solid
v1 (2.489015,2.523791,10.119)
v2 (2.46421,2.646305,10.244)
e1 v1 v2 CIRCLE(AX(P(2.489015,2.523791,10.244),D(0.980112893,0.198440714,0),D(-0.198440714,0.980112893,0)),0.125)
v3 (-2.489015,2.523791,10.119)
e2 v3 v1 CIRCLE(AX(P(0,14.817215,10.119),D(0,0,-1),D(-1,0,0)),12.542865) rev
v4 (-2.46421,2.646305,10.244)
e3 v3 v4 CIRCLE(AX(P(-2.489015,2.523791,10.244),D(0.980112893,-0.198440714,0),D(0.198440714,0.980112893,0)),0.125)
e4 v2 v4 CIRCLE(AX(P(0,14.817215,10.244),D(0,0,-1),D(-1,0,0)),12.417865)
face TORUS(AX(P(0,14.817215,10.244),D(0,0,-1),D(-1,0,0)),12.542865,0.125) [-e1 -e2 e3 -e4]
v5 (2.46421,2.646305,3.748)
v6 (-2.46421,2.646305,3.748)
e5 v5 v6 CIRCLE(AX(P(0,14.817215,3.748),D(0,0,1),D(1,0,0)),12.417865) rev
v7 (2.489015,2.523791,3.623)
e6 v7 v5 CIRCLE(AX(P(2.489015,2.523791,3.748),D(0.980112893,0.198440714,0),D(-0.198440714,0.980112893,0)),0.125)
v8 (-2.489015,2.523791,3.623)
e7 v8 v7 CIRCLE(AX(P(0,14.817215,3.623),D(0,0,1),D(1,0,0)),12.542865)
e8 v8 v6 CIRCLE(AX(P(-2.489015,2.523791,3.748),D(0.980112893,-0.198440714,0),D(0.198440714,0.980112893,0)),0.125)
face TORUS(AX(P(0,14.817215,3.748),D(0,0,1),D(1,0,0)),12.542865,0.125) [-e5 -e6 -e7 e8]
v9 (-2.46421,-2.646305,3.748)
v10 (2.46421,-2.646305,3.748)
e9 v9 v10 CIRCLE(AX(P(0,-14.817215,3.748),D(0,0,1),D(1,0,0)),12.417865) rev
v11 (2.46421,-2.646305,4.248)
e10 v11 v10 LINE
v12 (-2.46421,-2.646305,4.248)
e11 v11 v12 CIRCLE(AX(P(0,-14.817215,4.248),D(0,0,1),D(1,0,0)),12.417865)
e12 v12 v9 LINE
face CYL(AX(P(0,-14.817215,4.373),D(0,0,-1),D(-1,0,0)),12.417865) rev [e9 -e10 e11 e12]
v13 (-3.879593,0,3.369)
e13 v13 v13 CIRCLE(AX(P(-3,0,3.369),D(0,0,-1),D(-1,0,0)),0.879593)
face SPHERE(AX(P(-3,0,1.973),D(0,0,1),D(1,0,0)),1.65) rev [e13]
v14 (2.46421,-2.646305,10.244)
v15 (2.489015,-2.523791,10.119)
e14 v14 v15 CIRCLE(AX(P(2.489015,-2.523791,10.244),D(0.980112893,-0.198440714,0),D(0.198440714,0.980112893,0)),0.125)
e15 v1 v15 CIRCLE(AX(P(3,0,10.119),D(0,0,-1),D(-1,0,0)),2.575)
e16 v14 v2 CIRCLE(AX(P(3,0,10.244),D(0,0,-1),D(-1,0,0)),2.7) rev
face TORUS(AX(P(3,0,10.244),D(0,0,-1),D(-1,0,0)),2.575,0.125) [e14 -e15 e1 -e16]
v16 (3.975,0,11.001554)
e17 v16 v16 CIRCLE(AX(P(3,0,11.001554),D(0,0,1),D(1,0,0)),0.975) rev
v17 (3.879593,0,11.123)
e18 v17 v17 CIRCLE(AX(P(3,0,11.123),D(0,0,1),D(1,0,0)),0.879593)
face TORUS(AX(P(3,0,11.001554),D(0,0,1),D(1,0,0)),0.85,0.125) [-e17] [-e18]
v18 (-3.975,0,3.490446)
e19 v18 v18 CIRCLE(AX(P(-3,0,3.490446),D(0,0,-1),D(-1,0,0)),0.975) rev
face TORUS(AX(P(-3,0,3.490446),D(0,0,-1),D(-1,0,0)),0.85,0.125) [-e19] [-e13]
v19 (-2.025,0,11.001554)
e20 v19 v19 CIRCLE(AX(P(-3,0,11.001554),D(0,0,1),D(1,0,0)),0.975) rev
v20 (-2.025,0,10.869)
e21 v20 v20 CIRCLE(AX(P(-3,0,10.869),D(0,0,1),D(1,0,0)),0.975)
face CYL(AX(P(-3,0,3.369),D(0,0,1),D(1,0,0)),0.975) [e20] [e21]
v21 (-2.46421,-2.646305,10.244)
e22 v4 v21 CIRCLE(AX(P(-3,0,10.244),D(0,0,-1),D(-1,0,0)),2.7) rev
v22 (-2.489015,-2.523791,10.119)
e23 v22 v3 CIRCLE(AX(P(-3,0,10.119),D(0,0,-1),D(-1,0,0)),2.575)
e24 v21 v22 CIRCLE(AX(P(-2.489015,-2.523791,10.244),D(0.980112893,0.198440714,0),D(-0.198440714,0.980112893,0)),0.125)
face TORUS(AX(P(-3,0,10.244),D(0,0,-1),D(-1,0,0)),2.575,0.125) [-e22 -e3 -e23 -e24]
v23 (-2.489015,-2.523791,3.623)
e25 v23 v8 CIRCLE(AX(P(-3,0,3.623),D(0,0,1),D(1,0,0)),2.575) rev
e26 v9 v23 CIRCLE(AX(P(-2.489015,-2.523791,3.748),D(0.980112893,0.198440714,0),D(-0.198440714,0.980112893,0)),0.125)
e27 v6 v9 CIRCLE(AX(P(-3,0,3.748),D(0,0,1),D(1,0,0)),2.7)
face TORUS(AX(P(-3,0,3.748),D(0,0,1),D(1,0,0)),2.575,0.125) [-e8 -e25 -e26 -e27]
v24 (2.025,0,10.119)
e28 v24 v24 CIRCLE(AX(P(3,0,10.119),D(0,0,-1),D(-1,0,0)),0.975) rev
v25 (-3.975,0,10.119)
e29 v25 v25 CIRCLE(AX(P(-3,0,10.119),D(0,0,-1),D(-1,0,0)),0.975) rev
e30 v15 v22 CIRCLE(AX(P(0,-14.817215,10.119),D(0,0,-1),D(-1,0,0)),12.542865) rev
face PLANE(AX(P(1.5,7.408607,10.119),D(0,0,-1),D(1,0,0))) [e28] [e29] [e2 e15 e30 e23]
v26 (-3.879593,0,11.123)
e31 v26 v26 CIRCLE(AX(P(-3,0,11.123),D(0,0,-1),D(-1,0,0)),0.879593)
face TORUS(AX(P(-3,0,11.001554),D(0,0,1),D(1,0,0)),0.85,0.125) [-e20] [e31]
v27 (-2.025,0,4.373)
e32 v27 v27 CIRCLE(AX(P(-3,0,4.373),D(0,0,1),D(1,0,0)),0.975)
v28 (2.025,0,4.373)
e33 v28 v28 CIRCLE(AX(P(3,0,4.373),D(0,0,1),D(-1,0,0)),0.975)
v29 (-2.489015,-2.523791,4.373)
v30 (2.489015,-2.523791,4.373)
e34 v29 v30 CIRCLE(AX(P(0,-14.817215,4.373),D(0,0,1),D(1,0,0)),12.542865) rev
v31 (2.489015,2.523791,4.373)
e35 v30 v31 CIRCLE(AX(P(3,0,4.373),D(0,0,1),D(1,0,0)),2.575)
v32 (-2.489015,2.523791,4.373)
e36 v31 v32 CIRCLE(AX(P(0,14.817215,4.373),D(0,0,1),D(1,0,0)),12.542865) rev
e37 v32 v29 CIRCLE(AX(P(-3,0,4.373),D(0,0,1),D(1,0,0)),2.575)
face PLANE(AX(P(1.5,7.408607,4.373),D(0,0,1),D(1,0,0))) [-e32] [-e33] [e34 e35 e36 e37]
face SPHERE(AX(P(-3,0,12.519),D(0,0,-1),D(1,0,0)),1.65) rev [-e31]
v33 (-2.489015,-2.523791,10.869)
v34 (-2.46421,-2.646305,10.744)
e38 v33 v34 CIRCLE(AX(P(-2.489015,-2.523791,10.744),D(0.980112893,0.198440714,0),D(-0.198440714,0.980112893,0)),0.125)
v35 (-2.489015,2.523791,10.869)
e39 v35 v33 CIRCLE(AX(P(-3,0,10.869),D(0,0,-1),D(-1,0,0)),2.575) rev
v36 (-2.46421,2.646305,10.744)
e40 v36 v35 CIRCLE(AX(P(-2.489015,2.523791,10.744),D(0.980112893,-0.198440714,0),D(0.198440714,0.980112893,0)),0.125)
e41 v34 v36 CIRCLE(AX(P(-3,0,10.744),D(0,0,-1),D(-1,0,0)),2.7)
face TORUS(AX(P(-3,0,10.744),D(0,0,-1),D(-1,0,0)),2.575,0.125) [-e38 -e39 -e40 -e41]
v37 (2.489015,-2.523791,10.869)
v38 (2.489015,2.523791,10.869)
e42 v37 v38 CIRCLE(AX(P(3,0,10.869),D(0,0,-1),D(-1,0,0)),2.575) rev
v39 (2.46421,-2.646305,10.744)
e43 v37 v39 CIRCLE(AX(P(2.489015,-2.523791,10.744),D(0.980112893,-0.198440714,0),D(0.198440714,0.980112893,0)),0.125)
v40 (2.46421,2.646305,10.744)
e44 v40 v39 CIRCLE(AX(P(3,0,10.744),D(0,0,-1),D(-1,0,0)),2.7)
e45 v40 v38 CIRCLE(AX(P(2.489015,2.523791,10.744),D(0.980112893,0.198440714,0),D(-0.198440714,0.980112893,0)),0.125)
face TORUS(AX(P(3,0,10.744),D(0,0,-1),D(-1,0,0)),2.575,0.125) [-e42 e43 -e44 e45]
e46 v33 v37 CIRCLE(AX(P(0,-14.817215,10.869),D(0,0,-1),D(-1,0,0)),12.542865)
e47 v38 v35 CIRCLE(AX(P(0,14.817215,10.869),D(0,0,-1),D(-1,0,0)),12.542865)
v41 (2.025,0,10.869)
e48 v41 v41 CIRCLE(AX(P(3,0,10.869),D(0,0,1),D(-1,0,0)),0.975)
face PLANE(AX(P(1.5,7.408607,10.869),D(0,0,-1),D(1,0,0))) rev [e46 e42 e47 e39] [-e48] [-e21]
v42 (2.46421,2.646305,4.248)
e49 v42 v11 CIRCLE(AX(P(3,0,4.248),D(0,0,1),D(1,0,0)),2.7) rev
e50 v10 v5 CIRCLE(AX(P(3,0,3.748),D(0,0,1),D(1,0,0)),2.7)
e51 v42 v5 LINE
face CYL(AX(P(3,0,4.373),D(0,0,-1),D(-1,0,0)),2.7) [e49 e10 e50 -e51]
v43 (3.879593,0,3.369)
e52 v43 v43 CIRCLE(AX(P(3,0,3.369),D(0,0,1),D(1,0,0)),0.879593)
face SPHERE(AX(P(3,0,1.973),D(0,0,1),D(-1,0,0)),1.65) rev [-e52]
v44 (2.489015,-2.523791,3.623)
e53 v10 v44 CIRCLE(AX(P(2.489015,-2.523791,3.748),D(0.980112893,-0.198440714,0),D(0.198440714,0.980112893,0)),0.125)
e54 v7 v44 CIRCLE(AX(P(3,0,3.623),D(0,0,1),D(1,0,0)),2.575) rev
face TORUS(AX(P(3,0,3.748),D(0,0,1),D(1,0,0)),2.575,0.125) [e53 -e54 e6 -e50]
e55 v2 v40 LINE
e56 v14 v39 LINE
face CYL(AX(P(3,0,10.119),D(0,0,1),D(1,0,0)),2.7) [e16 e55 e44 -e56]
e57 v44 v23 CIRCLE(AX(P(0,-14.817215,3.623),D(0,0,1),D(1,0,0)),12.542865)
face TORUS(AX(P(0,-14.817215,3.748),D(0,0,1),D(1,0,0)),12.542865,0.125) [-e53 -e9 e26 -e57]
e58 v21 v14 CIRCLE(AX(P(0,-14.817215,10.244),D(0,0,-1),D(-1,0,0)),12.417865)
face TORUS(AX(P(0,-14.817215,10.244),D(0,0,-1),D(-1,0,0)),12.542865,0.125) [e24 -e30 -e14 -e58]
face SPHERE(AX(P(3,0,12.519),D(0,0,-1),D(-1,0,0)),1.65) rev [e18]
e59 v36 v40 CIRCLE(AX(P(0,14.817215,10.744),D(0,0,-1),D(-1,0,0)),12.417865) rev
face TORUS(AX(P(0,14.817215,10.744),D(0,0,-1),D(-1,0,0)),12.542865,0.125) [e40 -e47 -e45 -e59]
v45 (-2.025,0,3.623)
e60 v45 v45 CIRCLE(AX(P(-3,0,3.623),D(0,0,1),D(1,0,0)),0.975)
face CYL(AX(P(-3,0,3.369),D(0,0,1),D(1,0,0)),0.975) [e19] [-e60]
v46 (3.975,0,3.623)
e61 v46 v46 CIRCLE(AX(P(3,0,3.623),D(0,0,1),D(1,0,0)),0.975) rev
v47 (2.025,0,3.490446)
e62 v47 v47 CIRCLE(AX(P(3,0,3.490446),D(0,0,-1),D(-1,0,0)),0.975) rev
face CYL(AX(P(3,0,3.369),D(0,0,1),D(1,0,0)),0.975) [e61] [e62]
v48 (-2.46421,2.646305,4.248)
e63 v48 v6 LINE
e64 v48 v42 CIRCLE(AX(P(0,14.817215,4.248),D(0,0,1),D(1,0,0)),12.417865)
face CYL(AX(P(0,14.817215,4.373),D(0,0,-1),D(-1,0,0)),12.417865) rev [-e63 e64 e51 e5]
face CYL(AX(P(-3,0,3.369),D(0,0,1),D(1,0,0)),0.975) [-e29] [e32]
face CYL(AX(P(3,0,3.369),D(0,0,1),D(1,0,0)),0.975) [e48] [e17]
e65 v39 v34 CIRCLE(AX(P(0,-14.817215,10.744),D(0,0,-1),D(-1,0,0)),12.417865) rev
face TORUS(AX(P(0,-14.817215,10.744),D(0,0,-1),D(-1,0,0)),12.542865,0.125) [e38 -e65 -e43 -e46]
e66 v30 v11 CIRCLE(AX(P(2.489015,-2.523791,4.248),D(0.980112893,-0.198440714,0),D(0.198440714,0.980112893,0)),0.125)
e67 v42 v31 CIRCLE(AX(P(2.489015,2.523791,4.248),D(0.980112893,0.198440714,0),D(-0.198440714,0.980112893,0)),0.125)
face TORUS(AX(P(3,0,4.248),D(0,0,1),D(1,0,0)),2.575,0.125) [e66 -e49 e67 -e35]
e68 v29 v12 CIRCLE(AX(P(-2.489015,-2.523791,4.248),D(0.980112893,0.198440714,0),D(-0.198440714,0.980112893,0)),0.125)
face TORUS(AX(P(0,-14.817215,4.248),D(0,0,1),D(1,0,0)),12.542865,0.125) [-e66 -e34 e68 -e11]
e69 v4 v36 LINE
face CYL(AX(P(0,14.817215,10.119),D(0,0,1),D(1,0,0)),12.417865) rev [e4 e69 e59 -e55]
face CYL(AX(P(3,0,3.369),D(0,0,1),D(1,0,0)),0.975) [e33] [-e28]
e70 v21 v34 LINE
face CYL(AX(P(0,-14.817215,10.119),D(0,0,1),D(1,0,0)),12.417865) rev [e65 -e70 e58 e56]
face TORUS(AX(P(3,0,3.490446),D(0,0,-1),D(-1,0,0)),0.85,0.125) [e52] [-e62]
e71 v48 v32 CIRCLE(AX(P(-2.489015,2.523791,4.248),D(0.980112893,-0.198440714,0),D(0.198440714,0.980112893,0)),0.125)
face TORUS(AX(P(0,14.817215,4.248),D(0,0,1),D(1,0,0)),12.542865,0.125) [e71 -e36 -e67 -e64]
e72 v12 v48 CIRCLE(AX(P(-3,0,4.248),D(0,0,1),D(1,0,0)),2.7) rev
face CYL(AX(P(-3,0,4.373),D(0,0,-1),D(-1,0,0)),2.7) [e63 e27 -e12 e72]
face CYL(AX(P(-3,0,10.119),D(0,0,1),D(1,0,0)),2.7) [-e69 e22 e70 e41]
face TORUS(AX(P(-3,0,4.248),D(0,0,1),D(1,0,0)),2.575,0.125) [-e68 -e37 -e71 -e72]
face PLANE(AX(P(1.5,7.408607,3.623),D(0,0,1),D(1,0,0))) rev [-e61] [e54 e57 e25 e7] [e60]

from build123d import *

# Parameters (mm, degrees)
SKETCH1_R           = 1.95
BOSS_EXTRUDE1_DEPTH = 1.5
BOSS_EXTRUDE2_START = -0.508
SKETCH2_R           = 1.95
BOSS_EXTRUDE2_DEPTH = 15.508
FILLET1_R           = 0.25
FILLET2_R           = 0.25
SCALE1_SCALE        = 0.5


with BuildPart() as part:
    # Sketch1 → Boss-Extrude1 (new body)
    with BuildSketch(Plane.XY):
        with BuildLine():
            ThreePointArc((-4.928420143, 5.292609622), (-11.4, 0), (-4.928420143, -5.292609622))
            ThreePointArc((-4.928420143, -5.292609622), (0, -4.798698786), (4.928420143, -5.292609622))
            ThreePointArc((4.928420143, -5.292609622), (11.4, 0), (4.928420143, 5.292609622))
            ThreePointArc((4.928420143, 5.292609622), (0, 4.798698786), (-4.928420143, 5.292609622))
        make_face()
        with Locations((-6, 0)):
            Circle(SKETCH1_R, mode=Mode.SUBTRACT)
        with Locations(Location((6, 0, 0), (0, 0, 180))):
            Circle(SKETCH1_R, mode=Mode.SUBTRACT)
    boss_extrude1 = extrude(amount=BOSS_EXTRUDE1_DEPTH)

    # Sketch2 → Boss-Extrude2 (add)
    with BuildSketch(Plane.XY.offset(BOSS_EXTRUDE2_START)):
        with Locations((-6, 0)):
            Circle(SKETCH2_R)
    boss_extrude2 = extrude(amount=BOSS_EXTRUDE2_DEPTH)

    # Mirror1: Boss-Extrude1 across plane
    add(boss_extrude1.mirror(Plane.XY.offset(7.246)))

    # Sketch3 → Cut-Revolve3 (revolve, cut)
    with BuildSketch(Plane(origin=(0, 0, 0), x_dir=(1, 0, 0), z_dir=(0, 1, 0)), mode=Mode.PRIVATE) as cut_revolve3_sk:
        with BuildLine():
            Line((-7.759186175, -15), (-6, -15))
            Line((-6, -15), (-6, -14.492))
            ThreePointArc((-6, -14.492), (-6.915532632, -14.62154262), (-7.759186175, -15))
        make_face()
    cut_revolve3 = revolve(cut_revolve3_sk.sketch.rotate(Axis((-6, 0, 14.492), (0, 0, 1)), 180), axis=Axis((-6, 0, 14.492), (0, 0, 1)), mode=Mode.SUBTRACT)

    # Mirror4: Cut-Revolve3 across plane
    add(cut_revolve3.mirror(Plane.XY.offset(7.246)), mode=Mode.SUBTRACT)

    # Mirror2: Boss-Extrude2, Cut-Revolve3 across plane
    add(boss_extrude2.mirror(Plane(origin=(0, 0, 0), x_dir=(0, 0, 1), z_dir=(1, 0, 0))))
    add(cut_revolve3.mirror(Plane(origin=(0, 0, 0), x_dir=(0, 0, 1), z_dir=(1, 0, 0))), mode=Mode.SUBTRACT)

    # Mirror2 copy 1 sketch → Mirror2 copy 1 (revolve, cut)
    with BuildSketch(Plane(origin=(0, 0, 14.492), x_dir=(-1, 0, 0), z_dir=(0, 1, 0))):
        with BuildLine():
            Line((-7.759186175, -15), (-6, -15))
            Line((-6, -15), (-6, -14.492))
            ThreePointArc((-6, -14.492), (-6.915532632, -14.62154262), (-7.759186175, -15))
        make_face()
    revolve(axis=Axis((6, 0, 0), (0, 0, -1)), mode=Mode.SUBTRACT)

    # Fillet1
    fillet1_edges = [part.edges().sort_by_distance(p)[0] for p in [
        (0, -4.798698786, 1.5),
        (11.4, 0, 1.5),
        (0, 4.798698786, 12.992),
        (11.4, 0, 12.992),
        (0, -4.798698786, 12.992),
        (-11.4, 0, 12.992),
        (0, 4.798698786, 14.492),
        (-11.4, 0, 14.492),
        (0, -4.798698786, 14.492),
        (11.4, 0, 14.492),
        (0, 4.798698786, 1.5),
        (11.4, 0, 0),
        (0, -4.798698786, 0),
        (-11.4, 0, 0),
        (0, 4.798698786, 0),
        (-11.4, 0, 1.5),
    ]]
    fillet(fillet1_edges, radius=FILLET1_R)

    # Fillet2
    # the kernel refuses this fillet: 0.25 mm, written as the material it takes off along each edge
    with BuildSketch(Plane(origin=(-6, 0, -0.508), x_dir=(1, 0, 0), z_dir=(0, -1, 0))) as fillet2_piece_1:
        with BuildLine():
            CenterArc((1.7, 0.242892974), FILLET2_R, 283.694489324, 76.305510676)
            Line((1.759186175, 0), (1.760369899, -0.004857859))
            ThreePointArc((1.760369899, -0.004857859), (1.854593088, -0.005), (1.95, -0.005))
            Line((1.95, -0.005), (1.955, 0))
            Line((1.955, 0), (1.955, 0.242892974))
            Line((1.955, 0.242892974), (1.95, 0.242892974))
        make_face()
    revolve(axis=Axis((-6, 0, -0.508), (0, 0, 1)), mode=Mode.SUBTRACT)
    with BuildSketch(Plane(origin=(-6, 0, 15), x_dir=(1, 0, 0), z_dir=(0, -1, 0))) as fillet2_piece_2:
        with BuildLine():
            CenterArc((1.7, -0.242892974), FILLET2_R, 0, 76.305510676)
            Line((1.759186175, 0), (1.760369899, 0.004857859))
            ThreePointArc((1.760369899, 0.004857859), (1.854593088, 0.005), (1.95, 0.005))
            Line((1.95, 0.005), (1.955, 0))
            Line((1.955, 0), (1.955, -0.242892974))
            Line((1.955, -0.242892974), (1.95, -0.242892974))
        make_face()
    revolve(axis=Axis((-6, 0, 15), (0, 0, 1)), mode=Mode.SUBTRACT)
    with BuildSketch(Plane(origin=(6, 0, 15), x_dir=(-1, 0, 0), z_dir=(0, -1, 0))) as fillet2_piece_3:
        with BuildLine():
            CenterArc((1.7, 0.242892974), FILLET2_R, 283.694489324, 76.305510676)
            Line((1.759186175, 0), (1.760369899, -0.004857859))
            ThreePointArc((1.760369899, -0.004857859), (1.854593088, -0.005), (1.95, -0.005))
            Line((1.95, -0.005), (1.955, 0))
            Line((1.955, 0), (1.955, 0.242892974))
            Line((1.955, 0.242892974), (1.95, 0.242892974))
        make_face()
    revolve(axis=Axis((6, 0, 15), (0, 0, -1)), mode=Mode.SUBTRACT)
    with BuildSketch(Plane(origin=(6, 0, -0.508), x_dir=(-1, 0, 0), z_dir=(0, -1, 0))) as fillet2_piece_4:
        with BuildLine():
            CenterArc((1.7, -0.242892974), FILLET2_R, 0, 76.305510676)
            Line((1.759186175, 0), (1.760369899, 0.004857859))
            ThreePointArc((1.760369899, 0.004857859), (1.854593088, 0.005), (1.95, 0.005))
            Line((1.95, 0.005), (1.955, 0))
            Line((1.955, 0), (1.955, -0.242892974))
            Line((1.955, -0.242892974), (1.95, -0.242892974))
        make_face()
    revolve(axis=Axis((6, 0, -0.508), (0, 0, -1)), mode=Mode.SUBTRACT)


with BuildPart() as part_1:
    # Scale1: scaled about (0, 0, 7.246)
    add(part.part.scale(SCALE1_SCALE).moved(Location((0, 0, 3.623))))


solid = part_1.part
